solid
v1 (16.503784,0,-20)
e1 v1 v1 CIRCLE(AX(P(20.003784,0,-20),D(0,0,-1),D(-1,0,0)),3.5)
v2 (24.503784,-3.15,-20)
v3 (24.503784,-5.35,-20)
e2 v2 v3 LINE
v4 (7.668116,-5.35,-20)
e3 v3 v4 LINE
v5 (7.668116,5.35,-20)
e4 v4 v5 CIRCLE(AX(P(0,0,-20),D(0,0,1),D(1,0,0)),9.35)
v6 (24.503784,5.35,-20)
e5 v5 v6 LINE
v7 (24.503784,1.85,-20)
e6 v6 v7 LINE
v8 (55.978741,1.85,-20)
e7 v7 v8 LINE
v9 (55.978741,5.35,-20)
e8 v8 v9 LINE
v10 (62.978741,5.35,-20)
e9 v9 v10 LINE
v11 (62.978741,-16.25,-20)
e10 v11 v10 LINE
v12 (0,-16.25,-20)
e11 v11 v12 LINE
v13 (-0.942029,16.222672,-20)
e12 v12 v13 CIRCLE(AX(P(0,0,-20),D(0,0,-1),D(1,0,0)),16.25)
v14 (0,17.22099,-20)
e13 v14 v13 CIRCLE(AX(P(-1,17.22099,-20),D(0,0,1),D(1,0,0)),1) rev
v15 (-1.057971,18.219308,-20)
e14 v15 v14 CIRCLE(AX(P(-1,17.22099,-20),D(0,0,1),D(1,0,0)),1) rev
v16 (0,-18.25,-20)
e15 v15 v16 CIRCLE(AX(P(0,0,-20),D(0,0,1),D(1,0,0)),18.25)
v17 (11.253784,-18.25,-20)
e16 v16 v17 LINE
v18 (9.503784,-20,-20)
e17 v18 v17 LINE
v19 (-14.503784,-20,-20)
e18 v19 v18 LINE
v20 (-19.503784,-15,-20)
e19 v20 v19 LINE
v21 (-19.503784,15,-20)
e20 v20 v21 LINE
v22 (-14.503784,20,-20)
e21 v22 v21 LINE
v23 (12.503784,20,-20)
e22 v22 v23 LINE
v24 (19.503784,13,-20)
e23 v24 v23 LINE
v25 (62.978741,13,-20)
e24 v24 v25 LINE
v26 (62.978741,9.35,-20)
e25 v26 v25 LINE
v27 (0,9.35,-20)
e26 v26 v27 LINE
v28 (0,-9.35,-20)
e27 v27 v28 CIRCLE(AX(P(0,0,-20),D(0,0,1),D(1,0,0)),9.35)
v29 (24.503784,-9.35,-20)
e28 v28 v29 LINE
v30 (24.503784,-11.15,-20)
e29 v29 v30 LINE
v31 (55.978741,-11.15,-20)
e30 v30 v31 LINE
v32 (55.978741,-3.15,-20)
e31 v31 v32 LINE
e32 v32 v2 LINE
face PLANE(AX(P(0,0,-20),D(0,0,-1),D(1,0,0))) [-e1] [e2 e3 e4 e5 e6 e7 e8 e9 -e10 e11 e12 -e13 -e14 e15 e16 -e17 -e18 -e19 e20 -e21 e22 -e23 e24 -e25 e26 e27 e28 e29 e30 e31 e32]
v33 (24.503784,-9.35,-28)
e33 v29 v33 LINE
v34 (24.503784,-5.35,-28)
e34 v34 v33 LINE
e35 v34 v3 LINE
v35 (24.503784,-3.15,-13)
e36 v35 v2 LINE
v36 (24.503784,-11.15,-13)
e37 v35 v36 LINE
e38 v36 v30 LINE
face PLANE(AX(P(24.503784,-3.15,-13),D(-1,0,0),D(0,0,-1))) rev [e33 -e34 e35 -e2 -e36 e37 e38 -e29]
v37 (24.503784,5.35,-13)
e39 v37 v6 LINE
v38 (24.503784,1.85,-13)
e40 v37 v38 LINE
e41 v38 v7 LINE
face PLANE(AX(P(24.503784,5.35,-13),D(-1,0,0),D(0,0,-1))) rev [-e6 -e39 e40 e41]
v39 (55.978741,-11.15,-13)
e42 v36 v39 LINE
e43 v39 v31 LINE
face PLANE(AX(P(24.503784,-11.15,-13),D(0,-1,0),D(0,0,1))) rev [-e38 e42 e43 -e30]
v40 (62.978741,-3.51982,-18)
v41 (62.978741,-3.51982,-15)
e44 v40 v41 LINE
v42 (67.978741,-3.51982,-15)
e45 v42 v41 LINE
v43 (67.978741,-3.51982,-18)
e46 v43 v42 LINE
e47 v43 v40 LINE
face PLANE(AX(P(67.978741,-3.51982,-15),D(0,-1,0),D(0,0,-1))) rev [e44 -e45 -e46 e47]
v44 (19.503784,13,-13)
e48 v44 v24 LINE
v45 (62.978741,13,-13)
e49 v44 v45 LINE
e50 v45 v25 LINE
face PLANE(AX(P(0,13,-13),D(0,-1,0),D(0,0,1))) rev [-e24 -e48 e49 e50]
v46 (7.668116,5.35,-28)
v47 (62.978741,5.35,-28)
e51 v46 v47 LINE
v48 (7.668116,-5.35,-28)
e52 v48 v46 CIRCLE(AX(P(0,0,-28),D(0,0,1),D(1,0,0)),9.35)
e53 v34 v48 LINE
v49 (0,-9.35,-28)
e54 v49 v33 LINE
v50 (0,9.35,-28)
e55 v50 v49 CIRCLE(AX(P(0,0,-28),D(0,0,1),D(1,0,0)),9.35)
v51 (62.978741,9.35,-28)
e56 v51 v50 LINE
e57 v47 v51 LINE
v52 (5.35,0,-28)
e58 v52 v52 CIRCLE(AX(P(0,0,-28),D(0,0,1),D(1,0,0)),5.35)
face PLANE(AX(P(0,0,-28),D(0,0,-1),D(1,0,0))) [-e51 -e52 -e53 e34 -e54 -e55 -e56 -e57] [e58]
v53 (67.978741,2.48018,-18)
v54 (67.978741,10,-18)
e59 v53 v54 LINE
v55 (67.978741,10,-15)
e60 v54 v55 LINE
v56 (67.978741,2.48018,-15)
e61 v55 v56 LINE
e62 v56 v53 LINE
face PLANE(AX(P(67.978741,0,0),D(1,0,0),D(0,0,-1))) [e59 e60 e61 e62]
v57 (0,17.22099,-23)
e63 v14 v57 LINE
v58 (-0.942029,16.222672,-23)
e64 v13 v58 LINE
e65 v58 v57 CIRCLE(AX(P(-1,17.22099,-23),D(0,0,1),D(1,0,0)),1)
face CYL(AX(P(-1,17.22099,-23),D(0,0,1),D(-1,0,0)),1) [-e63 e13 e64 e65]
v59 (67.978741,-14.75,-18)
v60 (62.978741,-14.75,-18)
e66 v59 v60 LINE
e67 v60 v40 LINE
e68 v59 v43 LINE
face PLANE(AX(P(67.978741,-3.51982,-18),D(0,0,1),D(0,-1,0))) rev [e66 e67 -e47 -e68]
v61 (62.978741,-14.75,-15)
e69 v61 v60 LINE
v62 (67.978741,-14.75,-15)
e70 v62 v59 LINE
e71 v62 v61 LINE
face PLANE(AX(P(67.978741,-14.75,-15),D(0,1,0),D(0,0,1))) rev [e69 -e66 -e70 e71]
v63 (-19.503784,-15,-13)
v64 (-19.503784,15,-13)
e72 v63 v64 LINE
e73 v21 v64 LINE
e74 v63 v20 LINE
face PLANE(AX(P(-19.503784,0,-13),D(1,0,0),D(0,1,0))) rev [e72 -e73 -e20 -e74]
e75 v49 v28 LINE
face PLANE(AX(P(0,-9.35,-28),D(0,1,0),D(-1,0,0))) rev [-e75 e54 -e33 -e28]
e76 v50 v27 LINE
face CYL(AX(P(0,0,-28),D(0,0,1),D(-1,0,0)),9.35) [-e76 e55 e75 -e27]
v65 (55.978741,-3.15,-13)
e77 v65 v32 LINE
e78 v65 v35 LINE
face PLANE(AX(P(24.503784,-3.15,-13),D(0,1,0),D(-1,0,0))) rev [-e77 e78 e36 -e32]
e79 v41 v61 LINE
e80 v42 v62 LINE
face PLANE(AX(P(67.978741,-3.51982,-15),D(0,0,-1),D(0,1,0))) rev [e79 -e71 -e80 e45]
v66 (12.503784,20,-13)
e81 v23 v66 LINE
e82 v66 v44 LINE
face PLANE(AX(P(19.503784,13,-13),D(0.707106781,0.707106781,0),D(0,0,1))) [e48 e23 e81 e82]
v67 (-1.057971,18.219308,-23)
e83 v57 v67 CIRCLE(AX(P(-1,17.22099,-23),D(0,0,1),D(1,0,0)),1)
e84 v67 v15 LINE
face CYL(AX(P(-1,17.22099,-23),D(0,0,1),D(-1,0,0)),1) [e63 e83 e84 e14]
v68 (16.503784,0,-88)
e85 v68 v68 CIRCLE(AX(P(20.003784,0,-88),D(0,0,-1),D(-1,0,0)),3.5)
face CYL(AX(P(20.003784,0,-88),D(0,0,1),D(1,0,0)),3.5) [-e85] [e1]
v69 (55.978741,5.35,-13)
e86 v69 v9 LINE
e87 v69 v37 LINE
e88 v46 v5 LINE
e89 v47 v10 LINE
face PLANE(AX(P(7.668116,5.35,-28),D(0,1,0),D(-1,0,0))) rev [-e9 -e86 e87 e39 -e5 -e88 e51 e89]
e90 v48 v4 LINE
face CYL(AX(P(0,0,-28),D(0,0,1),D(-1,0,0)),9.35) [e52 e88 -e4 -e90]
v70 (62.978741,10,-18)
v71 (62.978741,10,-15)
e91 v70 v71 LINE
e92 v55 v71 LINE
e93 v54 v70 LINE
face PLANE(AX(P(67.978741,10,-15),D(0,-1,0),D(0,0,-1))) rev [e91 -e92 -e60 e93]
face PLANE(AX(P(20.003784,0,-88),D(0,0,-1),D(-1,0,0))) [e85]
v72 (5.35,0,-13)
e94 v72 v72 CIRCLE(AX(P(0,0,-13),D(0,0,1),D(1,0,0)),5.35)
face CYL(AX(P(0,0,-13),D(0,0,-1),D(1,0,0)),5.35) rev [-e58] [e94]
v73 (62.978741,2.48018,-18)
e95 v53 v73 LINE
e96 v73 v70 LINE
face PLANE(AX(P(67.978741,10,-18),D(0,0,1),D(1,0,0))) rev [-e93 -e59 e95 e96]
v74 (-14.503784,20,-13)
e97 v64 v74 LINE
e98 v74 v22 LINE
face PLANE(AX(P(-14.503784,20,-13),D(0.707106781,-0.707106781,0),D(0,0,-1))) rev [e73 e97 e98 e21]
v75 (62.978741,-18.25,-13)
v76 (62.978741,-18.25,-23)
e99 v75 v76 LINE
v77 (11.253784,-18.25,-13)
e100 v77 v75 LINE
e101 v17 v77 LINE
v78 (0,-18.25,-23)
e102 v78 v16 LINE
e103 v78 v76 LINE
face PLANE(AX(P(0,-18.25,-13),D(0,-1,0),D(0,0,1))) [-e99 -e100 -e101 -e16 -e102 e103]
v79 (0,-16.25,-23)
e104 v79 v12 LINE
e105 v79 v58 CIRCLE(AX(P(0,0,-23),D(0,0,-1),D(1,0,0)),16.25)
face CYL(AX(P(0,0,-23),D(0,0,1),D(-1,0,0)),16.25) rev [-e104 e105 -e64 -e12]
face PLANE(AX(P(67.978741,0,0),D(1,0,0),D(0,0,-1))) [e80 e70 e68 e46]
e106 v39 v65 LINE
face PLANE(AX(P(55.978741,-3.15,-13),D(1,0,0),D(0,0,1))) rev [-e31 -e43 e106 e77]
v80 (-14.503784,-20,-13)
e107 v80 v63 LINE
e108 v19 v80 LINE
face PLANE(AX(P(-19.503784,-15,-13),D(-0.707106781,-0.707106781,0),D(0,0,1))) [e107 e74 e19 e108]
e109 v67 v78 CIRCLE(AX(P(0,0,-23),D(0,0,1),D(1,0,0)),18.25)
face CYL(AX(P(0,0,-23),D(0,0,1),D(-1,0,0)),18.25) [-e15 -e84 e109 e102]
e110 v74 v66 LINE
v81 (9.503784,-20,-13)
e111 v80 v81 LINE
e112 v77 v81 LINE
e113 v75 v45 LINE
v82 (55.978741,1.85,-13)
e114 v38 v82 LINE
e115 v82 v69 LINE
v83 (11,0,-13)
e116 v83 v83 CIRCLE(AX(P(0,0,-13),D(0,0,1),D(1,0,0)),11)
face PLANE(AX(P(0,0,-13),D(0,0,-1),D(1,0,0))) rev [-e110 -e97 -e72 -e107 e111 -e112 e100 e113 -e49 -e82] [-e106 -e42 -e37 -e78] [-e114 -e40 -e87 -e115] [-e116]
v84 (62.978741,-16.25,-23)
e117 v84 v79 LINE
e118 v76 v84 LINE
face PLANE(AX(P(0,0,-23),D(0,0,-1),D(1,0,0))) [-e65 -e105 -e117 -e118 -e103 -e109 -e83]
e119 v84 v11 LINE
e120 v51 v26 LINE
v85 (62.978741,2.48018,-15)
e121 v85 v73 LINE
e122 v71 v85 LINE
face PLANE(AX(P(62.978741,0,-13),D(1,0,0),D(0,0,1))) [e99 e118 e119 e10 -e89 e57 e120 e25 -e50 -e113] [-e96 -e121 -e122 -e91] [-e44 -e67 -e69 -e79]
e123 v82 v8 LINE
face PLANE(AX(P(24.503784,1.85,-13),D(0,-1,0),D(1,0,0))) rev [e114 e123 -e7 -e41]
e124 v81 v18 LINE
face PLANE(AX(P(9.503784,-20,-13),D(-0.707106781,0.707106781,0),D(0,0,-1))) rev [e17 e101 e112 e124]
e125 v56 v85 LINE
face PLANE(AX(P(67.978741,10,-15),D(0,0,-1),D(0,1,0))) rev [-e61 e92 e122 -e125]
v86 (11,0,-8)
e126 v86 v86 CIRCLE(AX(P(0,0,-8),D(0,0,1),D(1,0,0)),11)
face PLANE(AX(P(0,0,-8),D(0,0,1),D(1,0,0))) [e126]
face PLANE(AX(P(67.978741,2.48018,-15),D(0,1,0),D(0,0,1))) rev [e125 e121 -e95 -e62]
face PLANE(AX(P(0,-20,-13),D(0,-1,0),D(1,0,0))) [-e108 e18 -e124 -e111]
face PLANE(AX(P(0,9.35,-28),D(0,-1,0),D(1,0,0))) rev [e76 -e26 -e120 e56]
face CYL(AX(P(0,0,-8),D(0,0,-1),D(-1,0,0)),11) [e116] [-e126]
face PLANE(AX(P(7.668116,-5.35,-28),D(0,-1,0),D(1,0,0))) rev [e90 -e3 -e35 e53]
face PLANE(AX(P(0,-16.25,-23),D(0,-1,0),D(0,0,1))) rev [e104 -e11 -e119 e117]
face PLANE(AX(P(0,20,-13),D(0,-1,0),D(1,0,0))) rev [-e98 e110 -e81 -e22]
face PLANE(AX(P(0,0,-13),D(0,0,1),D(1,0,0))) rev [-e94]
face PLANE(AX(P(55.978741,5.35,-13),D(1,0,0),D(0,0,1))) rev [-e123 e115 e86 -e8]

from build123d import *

# Parameters (mm, degrees)
SKETCH1_R               = 5.35
BOSS_EXTRUDE2_DEPTH     = 7
BOSS_EXTRUDE3_START     = 8
SKETCH3_R               = 5.35
BOSS_EXTRUDE3_DEPTH     = 8
BOSS_EXTRUDE4_DEPTH     = 3
FILLET1_R               = 1
CHAMFER1_SIZE           = 10
CHAMFER2_SIZE           = 5
CUT_EXTRUDE1_DEPTH      = 67.560662475
CUT_EXTRUDE1_DEPTH_BACK = 67.560662475
SKETCH5_W               = 31.474956737
SKETCH5_H               = 3.5
SKETCH5_H_2             = 8
CHAMFER3_SIZE           = 7
SKETCH6_R               = 11
BOSS_EXTRUDE5_DEPTH     = 5
SKETCH8_W               = 3
SKETCH8_H               = 7.519820499
SKETCH8_H_2             = 11.230179501
BOSS_EXTRUDE6_DEPTH     = 5
SKETCH9_R               = 3.5
BOSS_EXTRUDE7_DEPTH     = 68
CUT_EXTRUDE2_REACH      = 124.259
SKETCH10_W              = 8
SKETCH10_H              = 4


# Some blends are built 0.0001 mm under size
with BuildPart() as part:
    # Sketch1 → Boss-Extrude2 (new body)
    with BuildSketch(Plane.XY):
        Polygon((-19.503784034, -20), (19.503784034, -20), (19.503784034, -18.25), (62.978740771, -18.25), (62.978740771, 13), (19.503784034, 13), (19.503784034, 20), (-19.503784034, 20), align=None)
        Circle(SKETCH1_R, mode=Mode.SUBTRACT)
    extrude(amount=-BOSS_EXTRUDE2_DEPTH)

    # Sketch3 → Boss-Extrude3 (add)
    with BuildSketch(Plane.XY.offset(BOSS_EXTRUDE3_START)):
        with BuildLine():
            Line((7.668115805, 5.35), (62.978740771, 5.35))
            Line((62.978740771, 5.35), (62.978740771, 9.35))
            Line((62.978740771, 9.35), (0, 9.35))
            ThreePointArc((0, 9.35), (-9.35, 0), (0, -9.35))
            Line((0, -9.35), (62.978740771, -9.35))
            Line((62.978740771, -9.35), (62.978740771, -5.35))
            Line((62.978740771, -5.35), (7.668115805, -5.35))
            ThreePointArc((7.668115805, -5.35), (9.35, 0), (7.668115805, 5.35))
        make_face()
        Circle(SKETCH3_R, mode=Mode.SUBTRACT)
    extrude(amount=-BOSS_EXTRUDE3_DEPTH)

    # Sketch4 → Boss-Extrude4 (add)
    with BuildSketch(Plane.XY):
        with BuildLine():
            Line((0, -18.25), (62.978740771, -18.25))
            Line((62.978740771, -18.25), (62.978740771, -16.25))
            Line((62.978740771, -16.25), (8.306623863, -16.25))
            Line((8.306623863, -16.25), (0, -16.25))
            ThreePointArc((0, -16.25), (-16.25, 0), (0, 16.25))
            Line((0, 16.25), (0, 18.25))
            ThreePointArc((0, 18.25), (-18.25, 0), (0, -18.25))
        make_face()
    extrude(amount=BOSS_EXTRUDE4_DEPTH)

    # Fillet1
    fillet1_edges = [part.edges().sort_by_distance(p)[0] for p in [
        (0, 16.25, 1.5),
        (0, 18.25, 1.5),
    ]]
    fillet(fillet1_edges, radius=FILLET1_R - 0.0001)  # a hair under: the kernel refuses the full size

    # Chamfer1
    # the kernel refuses this chamfer: 10 mm, written as the material it takes off along each edge
    with BuildSketch(Plane(origin=(19.503784034, -20, 25.71682988), x_dir=(0.027495876610586317, 0.9996219169112968, 0), z_dir=(0, 0, -1))) as chamfer1_piece_1_section:
        Polygon((CHAMFER1_SIZE * 0.999621916911, -CHAMFER1_SIZE * 0.0274958766106), (-CHAMFER1_SIZE * 0.0274958766106, -CHAMFER1_SIZE * 0.999621916911), (0, 0), align=None)
    chamfer1_piece_1 = extrude(amount=58.433659759, mode=Mode.PRIVATE)
    chamfer1_piece_1 = split(chamfer1_piece_1, bisect_by=Plane(origin=(14.814200223, -18.25, -3.5), z_dir=(0, -1, 0)), keep=Keep.TOP, mode=Mode.PRIVATE)
    add(chamfer1_piece_1, mode=Mode.SUBTRACT)

    # Chamfer2
    chamfer2_edges = [part.edges().sort_by_distance(p)[0] for p in [
        (-19.503784034, -20, -3.5),
        (-19.503784034, 20, -3.5),
    ]]
    chamfer(chamfer2_edges, length=CHAMFER2_SIZE)

    # Sketch5 → Cut-Extrude1 (cut, two sides: drawn at the far end of the back side and taken through both)
    with BuildSketch(Plane.XY.offset(-CUT_EXTRUDE1_DEPTH_BACK)):
        with Locations((40.241262403, 3.6)):
            Rectangle(SKETCH5_W, SKETCH5_H)
        with Locations((40.241262403, -7.15)):
            Rectangle(SKETCH5_W, SKETCH5_H_2)
    extrude(amount=CUT_EXTRUDE1_DEPTH + CUT_EXTRUDE1_DEPTH_BACK, mode=Mode.SUBTRACT)

    # Chamfer3
    chamfer3_edges = [part.edges().sort_by_distance(p)[0] for p in [
        (19.503784034, 20, -3.5),
    ]]
    chamfer(chamfer3_edges, length=CHAMFER3_SIZE - 0.0001)  # a hair under: the kernel refuses the full size


with BuildPart() as body_2:
    # Mirror9: mirrored copy
    add(part.part.mirror(Plane.XY.offset(-10)))

    # Sketch6 → Boss-Extrude5 (add)
    with BuildSketch(Plane.XY.offset(-13)):
        Circle(SKETCH6_R)
    extrude(amount=BOSS_EXTRUDE5_DEPTH)

    # Sketch8 → Boss-Extrude6 (add)
    with BuildSketch(Plane(origin=(62.978740771, 0, 0), x_dir=(0, 0, -1), z_dir=(1, 0, 0))):
        with Locations((16.5, 6.240089751)):
            Rectangle(SKETCH8_W, SKETCH8_H)
        with Locations((16.5, -9.13491025)):
            Rectangle(SKETCH8_W, SKETCH8_H_2)
    extrude(amount=BOSS_EXTRUDE6_DEPTH)

    # Sketch9 → Boss-Extrude7 (add)
    with BuildSketch(Plane(origin=(0, 0, -20), x_dir=(-1, 0, 0), z_dir=(0, 0, -1))):
        with Locations((-20.003784034, 0)):
            Circle(SKETCH9_R)
    extrude(amount=BOSS_EXTRUDE7_DEPTH)

    # Sketch10 → Cut-Extrude2 (cut, up to next)
    with BuildSketch(Plane(origin=(62.978740771, 0, 0), x_dir=(0, 0, -1), z_dir=(1, 0, 0)), mode=Mode.PRIVATE) as cut_extrude2_sk1:
        with Locations((24, -7.35)):
            Rectangle(SKETCH10_W, SKETCH10_H)
    cut_extrude2_tool1 = extrude(cut_extrude2_sk1.sketch, amount=-CUT_EXTRUDE2_REACH, mode=Mode.PRIVATE) & body_2.part
    add(cut_extrude2_tool1.solids().sort_by_distance((62.978741, -7.35, -24))[0], mode=Mode.SUBTRACT)


solid = body_2.part
